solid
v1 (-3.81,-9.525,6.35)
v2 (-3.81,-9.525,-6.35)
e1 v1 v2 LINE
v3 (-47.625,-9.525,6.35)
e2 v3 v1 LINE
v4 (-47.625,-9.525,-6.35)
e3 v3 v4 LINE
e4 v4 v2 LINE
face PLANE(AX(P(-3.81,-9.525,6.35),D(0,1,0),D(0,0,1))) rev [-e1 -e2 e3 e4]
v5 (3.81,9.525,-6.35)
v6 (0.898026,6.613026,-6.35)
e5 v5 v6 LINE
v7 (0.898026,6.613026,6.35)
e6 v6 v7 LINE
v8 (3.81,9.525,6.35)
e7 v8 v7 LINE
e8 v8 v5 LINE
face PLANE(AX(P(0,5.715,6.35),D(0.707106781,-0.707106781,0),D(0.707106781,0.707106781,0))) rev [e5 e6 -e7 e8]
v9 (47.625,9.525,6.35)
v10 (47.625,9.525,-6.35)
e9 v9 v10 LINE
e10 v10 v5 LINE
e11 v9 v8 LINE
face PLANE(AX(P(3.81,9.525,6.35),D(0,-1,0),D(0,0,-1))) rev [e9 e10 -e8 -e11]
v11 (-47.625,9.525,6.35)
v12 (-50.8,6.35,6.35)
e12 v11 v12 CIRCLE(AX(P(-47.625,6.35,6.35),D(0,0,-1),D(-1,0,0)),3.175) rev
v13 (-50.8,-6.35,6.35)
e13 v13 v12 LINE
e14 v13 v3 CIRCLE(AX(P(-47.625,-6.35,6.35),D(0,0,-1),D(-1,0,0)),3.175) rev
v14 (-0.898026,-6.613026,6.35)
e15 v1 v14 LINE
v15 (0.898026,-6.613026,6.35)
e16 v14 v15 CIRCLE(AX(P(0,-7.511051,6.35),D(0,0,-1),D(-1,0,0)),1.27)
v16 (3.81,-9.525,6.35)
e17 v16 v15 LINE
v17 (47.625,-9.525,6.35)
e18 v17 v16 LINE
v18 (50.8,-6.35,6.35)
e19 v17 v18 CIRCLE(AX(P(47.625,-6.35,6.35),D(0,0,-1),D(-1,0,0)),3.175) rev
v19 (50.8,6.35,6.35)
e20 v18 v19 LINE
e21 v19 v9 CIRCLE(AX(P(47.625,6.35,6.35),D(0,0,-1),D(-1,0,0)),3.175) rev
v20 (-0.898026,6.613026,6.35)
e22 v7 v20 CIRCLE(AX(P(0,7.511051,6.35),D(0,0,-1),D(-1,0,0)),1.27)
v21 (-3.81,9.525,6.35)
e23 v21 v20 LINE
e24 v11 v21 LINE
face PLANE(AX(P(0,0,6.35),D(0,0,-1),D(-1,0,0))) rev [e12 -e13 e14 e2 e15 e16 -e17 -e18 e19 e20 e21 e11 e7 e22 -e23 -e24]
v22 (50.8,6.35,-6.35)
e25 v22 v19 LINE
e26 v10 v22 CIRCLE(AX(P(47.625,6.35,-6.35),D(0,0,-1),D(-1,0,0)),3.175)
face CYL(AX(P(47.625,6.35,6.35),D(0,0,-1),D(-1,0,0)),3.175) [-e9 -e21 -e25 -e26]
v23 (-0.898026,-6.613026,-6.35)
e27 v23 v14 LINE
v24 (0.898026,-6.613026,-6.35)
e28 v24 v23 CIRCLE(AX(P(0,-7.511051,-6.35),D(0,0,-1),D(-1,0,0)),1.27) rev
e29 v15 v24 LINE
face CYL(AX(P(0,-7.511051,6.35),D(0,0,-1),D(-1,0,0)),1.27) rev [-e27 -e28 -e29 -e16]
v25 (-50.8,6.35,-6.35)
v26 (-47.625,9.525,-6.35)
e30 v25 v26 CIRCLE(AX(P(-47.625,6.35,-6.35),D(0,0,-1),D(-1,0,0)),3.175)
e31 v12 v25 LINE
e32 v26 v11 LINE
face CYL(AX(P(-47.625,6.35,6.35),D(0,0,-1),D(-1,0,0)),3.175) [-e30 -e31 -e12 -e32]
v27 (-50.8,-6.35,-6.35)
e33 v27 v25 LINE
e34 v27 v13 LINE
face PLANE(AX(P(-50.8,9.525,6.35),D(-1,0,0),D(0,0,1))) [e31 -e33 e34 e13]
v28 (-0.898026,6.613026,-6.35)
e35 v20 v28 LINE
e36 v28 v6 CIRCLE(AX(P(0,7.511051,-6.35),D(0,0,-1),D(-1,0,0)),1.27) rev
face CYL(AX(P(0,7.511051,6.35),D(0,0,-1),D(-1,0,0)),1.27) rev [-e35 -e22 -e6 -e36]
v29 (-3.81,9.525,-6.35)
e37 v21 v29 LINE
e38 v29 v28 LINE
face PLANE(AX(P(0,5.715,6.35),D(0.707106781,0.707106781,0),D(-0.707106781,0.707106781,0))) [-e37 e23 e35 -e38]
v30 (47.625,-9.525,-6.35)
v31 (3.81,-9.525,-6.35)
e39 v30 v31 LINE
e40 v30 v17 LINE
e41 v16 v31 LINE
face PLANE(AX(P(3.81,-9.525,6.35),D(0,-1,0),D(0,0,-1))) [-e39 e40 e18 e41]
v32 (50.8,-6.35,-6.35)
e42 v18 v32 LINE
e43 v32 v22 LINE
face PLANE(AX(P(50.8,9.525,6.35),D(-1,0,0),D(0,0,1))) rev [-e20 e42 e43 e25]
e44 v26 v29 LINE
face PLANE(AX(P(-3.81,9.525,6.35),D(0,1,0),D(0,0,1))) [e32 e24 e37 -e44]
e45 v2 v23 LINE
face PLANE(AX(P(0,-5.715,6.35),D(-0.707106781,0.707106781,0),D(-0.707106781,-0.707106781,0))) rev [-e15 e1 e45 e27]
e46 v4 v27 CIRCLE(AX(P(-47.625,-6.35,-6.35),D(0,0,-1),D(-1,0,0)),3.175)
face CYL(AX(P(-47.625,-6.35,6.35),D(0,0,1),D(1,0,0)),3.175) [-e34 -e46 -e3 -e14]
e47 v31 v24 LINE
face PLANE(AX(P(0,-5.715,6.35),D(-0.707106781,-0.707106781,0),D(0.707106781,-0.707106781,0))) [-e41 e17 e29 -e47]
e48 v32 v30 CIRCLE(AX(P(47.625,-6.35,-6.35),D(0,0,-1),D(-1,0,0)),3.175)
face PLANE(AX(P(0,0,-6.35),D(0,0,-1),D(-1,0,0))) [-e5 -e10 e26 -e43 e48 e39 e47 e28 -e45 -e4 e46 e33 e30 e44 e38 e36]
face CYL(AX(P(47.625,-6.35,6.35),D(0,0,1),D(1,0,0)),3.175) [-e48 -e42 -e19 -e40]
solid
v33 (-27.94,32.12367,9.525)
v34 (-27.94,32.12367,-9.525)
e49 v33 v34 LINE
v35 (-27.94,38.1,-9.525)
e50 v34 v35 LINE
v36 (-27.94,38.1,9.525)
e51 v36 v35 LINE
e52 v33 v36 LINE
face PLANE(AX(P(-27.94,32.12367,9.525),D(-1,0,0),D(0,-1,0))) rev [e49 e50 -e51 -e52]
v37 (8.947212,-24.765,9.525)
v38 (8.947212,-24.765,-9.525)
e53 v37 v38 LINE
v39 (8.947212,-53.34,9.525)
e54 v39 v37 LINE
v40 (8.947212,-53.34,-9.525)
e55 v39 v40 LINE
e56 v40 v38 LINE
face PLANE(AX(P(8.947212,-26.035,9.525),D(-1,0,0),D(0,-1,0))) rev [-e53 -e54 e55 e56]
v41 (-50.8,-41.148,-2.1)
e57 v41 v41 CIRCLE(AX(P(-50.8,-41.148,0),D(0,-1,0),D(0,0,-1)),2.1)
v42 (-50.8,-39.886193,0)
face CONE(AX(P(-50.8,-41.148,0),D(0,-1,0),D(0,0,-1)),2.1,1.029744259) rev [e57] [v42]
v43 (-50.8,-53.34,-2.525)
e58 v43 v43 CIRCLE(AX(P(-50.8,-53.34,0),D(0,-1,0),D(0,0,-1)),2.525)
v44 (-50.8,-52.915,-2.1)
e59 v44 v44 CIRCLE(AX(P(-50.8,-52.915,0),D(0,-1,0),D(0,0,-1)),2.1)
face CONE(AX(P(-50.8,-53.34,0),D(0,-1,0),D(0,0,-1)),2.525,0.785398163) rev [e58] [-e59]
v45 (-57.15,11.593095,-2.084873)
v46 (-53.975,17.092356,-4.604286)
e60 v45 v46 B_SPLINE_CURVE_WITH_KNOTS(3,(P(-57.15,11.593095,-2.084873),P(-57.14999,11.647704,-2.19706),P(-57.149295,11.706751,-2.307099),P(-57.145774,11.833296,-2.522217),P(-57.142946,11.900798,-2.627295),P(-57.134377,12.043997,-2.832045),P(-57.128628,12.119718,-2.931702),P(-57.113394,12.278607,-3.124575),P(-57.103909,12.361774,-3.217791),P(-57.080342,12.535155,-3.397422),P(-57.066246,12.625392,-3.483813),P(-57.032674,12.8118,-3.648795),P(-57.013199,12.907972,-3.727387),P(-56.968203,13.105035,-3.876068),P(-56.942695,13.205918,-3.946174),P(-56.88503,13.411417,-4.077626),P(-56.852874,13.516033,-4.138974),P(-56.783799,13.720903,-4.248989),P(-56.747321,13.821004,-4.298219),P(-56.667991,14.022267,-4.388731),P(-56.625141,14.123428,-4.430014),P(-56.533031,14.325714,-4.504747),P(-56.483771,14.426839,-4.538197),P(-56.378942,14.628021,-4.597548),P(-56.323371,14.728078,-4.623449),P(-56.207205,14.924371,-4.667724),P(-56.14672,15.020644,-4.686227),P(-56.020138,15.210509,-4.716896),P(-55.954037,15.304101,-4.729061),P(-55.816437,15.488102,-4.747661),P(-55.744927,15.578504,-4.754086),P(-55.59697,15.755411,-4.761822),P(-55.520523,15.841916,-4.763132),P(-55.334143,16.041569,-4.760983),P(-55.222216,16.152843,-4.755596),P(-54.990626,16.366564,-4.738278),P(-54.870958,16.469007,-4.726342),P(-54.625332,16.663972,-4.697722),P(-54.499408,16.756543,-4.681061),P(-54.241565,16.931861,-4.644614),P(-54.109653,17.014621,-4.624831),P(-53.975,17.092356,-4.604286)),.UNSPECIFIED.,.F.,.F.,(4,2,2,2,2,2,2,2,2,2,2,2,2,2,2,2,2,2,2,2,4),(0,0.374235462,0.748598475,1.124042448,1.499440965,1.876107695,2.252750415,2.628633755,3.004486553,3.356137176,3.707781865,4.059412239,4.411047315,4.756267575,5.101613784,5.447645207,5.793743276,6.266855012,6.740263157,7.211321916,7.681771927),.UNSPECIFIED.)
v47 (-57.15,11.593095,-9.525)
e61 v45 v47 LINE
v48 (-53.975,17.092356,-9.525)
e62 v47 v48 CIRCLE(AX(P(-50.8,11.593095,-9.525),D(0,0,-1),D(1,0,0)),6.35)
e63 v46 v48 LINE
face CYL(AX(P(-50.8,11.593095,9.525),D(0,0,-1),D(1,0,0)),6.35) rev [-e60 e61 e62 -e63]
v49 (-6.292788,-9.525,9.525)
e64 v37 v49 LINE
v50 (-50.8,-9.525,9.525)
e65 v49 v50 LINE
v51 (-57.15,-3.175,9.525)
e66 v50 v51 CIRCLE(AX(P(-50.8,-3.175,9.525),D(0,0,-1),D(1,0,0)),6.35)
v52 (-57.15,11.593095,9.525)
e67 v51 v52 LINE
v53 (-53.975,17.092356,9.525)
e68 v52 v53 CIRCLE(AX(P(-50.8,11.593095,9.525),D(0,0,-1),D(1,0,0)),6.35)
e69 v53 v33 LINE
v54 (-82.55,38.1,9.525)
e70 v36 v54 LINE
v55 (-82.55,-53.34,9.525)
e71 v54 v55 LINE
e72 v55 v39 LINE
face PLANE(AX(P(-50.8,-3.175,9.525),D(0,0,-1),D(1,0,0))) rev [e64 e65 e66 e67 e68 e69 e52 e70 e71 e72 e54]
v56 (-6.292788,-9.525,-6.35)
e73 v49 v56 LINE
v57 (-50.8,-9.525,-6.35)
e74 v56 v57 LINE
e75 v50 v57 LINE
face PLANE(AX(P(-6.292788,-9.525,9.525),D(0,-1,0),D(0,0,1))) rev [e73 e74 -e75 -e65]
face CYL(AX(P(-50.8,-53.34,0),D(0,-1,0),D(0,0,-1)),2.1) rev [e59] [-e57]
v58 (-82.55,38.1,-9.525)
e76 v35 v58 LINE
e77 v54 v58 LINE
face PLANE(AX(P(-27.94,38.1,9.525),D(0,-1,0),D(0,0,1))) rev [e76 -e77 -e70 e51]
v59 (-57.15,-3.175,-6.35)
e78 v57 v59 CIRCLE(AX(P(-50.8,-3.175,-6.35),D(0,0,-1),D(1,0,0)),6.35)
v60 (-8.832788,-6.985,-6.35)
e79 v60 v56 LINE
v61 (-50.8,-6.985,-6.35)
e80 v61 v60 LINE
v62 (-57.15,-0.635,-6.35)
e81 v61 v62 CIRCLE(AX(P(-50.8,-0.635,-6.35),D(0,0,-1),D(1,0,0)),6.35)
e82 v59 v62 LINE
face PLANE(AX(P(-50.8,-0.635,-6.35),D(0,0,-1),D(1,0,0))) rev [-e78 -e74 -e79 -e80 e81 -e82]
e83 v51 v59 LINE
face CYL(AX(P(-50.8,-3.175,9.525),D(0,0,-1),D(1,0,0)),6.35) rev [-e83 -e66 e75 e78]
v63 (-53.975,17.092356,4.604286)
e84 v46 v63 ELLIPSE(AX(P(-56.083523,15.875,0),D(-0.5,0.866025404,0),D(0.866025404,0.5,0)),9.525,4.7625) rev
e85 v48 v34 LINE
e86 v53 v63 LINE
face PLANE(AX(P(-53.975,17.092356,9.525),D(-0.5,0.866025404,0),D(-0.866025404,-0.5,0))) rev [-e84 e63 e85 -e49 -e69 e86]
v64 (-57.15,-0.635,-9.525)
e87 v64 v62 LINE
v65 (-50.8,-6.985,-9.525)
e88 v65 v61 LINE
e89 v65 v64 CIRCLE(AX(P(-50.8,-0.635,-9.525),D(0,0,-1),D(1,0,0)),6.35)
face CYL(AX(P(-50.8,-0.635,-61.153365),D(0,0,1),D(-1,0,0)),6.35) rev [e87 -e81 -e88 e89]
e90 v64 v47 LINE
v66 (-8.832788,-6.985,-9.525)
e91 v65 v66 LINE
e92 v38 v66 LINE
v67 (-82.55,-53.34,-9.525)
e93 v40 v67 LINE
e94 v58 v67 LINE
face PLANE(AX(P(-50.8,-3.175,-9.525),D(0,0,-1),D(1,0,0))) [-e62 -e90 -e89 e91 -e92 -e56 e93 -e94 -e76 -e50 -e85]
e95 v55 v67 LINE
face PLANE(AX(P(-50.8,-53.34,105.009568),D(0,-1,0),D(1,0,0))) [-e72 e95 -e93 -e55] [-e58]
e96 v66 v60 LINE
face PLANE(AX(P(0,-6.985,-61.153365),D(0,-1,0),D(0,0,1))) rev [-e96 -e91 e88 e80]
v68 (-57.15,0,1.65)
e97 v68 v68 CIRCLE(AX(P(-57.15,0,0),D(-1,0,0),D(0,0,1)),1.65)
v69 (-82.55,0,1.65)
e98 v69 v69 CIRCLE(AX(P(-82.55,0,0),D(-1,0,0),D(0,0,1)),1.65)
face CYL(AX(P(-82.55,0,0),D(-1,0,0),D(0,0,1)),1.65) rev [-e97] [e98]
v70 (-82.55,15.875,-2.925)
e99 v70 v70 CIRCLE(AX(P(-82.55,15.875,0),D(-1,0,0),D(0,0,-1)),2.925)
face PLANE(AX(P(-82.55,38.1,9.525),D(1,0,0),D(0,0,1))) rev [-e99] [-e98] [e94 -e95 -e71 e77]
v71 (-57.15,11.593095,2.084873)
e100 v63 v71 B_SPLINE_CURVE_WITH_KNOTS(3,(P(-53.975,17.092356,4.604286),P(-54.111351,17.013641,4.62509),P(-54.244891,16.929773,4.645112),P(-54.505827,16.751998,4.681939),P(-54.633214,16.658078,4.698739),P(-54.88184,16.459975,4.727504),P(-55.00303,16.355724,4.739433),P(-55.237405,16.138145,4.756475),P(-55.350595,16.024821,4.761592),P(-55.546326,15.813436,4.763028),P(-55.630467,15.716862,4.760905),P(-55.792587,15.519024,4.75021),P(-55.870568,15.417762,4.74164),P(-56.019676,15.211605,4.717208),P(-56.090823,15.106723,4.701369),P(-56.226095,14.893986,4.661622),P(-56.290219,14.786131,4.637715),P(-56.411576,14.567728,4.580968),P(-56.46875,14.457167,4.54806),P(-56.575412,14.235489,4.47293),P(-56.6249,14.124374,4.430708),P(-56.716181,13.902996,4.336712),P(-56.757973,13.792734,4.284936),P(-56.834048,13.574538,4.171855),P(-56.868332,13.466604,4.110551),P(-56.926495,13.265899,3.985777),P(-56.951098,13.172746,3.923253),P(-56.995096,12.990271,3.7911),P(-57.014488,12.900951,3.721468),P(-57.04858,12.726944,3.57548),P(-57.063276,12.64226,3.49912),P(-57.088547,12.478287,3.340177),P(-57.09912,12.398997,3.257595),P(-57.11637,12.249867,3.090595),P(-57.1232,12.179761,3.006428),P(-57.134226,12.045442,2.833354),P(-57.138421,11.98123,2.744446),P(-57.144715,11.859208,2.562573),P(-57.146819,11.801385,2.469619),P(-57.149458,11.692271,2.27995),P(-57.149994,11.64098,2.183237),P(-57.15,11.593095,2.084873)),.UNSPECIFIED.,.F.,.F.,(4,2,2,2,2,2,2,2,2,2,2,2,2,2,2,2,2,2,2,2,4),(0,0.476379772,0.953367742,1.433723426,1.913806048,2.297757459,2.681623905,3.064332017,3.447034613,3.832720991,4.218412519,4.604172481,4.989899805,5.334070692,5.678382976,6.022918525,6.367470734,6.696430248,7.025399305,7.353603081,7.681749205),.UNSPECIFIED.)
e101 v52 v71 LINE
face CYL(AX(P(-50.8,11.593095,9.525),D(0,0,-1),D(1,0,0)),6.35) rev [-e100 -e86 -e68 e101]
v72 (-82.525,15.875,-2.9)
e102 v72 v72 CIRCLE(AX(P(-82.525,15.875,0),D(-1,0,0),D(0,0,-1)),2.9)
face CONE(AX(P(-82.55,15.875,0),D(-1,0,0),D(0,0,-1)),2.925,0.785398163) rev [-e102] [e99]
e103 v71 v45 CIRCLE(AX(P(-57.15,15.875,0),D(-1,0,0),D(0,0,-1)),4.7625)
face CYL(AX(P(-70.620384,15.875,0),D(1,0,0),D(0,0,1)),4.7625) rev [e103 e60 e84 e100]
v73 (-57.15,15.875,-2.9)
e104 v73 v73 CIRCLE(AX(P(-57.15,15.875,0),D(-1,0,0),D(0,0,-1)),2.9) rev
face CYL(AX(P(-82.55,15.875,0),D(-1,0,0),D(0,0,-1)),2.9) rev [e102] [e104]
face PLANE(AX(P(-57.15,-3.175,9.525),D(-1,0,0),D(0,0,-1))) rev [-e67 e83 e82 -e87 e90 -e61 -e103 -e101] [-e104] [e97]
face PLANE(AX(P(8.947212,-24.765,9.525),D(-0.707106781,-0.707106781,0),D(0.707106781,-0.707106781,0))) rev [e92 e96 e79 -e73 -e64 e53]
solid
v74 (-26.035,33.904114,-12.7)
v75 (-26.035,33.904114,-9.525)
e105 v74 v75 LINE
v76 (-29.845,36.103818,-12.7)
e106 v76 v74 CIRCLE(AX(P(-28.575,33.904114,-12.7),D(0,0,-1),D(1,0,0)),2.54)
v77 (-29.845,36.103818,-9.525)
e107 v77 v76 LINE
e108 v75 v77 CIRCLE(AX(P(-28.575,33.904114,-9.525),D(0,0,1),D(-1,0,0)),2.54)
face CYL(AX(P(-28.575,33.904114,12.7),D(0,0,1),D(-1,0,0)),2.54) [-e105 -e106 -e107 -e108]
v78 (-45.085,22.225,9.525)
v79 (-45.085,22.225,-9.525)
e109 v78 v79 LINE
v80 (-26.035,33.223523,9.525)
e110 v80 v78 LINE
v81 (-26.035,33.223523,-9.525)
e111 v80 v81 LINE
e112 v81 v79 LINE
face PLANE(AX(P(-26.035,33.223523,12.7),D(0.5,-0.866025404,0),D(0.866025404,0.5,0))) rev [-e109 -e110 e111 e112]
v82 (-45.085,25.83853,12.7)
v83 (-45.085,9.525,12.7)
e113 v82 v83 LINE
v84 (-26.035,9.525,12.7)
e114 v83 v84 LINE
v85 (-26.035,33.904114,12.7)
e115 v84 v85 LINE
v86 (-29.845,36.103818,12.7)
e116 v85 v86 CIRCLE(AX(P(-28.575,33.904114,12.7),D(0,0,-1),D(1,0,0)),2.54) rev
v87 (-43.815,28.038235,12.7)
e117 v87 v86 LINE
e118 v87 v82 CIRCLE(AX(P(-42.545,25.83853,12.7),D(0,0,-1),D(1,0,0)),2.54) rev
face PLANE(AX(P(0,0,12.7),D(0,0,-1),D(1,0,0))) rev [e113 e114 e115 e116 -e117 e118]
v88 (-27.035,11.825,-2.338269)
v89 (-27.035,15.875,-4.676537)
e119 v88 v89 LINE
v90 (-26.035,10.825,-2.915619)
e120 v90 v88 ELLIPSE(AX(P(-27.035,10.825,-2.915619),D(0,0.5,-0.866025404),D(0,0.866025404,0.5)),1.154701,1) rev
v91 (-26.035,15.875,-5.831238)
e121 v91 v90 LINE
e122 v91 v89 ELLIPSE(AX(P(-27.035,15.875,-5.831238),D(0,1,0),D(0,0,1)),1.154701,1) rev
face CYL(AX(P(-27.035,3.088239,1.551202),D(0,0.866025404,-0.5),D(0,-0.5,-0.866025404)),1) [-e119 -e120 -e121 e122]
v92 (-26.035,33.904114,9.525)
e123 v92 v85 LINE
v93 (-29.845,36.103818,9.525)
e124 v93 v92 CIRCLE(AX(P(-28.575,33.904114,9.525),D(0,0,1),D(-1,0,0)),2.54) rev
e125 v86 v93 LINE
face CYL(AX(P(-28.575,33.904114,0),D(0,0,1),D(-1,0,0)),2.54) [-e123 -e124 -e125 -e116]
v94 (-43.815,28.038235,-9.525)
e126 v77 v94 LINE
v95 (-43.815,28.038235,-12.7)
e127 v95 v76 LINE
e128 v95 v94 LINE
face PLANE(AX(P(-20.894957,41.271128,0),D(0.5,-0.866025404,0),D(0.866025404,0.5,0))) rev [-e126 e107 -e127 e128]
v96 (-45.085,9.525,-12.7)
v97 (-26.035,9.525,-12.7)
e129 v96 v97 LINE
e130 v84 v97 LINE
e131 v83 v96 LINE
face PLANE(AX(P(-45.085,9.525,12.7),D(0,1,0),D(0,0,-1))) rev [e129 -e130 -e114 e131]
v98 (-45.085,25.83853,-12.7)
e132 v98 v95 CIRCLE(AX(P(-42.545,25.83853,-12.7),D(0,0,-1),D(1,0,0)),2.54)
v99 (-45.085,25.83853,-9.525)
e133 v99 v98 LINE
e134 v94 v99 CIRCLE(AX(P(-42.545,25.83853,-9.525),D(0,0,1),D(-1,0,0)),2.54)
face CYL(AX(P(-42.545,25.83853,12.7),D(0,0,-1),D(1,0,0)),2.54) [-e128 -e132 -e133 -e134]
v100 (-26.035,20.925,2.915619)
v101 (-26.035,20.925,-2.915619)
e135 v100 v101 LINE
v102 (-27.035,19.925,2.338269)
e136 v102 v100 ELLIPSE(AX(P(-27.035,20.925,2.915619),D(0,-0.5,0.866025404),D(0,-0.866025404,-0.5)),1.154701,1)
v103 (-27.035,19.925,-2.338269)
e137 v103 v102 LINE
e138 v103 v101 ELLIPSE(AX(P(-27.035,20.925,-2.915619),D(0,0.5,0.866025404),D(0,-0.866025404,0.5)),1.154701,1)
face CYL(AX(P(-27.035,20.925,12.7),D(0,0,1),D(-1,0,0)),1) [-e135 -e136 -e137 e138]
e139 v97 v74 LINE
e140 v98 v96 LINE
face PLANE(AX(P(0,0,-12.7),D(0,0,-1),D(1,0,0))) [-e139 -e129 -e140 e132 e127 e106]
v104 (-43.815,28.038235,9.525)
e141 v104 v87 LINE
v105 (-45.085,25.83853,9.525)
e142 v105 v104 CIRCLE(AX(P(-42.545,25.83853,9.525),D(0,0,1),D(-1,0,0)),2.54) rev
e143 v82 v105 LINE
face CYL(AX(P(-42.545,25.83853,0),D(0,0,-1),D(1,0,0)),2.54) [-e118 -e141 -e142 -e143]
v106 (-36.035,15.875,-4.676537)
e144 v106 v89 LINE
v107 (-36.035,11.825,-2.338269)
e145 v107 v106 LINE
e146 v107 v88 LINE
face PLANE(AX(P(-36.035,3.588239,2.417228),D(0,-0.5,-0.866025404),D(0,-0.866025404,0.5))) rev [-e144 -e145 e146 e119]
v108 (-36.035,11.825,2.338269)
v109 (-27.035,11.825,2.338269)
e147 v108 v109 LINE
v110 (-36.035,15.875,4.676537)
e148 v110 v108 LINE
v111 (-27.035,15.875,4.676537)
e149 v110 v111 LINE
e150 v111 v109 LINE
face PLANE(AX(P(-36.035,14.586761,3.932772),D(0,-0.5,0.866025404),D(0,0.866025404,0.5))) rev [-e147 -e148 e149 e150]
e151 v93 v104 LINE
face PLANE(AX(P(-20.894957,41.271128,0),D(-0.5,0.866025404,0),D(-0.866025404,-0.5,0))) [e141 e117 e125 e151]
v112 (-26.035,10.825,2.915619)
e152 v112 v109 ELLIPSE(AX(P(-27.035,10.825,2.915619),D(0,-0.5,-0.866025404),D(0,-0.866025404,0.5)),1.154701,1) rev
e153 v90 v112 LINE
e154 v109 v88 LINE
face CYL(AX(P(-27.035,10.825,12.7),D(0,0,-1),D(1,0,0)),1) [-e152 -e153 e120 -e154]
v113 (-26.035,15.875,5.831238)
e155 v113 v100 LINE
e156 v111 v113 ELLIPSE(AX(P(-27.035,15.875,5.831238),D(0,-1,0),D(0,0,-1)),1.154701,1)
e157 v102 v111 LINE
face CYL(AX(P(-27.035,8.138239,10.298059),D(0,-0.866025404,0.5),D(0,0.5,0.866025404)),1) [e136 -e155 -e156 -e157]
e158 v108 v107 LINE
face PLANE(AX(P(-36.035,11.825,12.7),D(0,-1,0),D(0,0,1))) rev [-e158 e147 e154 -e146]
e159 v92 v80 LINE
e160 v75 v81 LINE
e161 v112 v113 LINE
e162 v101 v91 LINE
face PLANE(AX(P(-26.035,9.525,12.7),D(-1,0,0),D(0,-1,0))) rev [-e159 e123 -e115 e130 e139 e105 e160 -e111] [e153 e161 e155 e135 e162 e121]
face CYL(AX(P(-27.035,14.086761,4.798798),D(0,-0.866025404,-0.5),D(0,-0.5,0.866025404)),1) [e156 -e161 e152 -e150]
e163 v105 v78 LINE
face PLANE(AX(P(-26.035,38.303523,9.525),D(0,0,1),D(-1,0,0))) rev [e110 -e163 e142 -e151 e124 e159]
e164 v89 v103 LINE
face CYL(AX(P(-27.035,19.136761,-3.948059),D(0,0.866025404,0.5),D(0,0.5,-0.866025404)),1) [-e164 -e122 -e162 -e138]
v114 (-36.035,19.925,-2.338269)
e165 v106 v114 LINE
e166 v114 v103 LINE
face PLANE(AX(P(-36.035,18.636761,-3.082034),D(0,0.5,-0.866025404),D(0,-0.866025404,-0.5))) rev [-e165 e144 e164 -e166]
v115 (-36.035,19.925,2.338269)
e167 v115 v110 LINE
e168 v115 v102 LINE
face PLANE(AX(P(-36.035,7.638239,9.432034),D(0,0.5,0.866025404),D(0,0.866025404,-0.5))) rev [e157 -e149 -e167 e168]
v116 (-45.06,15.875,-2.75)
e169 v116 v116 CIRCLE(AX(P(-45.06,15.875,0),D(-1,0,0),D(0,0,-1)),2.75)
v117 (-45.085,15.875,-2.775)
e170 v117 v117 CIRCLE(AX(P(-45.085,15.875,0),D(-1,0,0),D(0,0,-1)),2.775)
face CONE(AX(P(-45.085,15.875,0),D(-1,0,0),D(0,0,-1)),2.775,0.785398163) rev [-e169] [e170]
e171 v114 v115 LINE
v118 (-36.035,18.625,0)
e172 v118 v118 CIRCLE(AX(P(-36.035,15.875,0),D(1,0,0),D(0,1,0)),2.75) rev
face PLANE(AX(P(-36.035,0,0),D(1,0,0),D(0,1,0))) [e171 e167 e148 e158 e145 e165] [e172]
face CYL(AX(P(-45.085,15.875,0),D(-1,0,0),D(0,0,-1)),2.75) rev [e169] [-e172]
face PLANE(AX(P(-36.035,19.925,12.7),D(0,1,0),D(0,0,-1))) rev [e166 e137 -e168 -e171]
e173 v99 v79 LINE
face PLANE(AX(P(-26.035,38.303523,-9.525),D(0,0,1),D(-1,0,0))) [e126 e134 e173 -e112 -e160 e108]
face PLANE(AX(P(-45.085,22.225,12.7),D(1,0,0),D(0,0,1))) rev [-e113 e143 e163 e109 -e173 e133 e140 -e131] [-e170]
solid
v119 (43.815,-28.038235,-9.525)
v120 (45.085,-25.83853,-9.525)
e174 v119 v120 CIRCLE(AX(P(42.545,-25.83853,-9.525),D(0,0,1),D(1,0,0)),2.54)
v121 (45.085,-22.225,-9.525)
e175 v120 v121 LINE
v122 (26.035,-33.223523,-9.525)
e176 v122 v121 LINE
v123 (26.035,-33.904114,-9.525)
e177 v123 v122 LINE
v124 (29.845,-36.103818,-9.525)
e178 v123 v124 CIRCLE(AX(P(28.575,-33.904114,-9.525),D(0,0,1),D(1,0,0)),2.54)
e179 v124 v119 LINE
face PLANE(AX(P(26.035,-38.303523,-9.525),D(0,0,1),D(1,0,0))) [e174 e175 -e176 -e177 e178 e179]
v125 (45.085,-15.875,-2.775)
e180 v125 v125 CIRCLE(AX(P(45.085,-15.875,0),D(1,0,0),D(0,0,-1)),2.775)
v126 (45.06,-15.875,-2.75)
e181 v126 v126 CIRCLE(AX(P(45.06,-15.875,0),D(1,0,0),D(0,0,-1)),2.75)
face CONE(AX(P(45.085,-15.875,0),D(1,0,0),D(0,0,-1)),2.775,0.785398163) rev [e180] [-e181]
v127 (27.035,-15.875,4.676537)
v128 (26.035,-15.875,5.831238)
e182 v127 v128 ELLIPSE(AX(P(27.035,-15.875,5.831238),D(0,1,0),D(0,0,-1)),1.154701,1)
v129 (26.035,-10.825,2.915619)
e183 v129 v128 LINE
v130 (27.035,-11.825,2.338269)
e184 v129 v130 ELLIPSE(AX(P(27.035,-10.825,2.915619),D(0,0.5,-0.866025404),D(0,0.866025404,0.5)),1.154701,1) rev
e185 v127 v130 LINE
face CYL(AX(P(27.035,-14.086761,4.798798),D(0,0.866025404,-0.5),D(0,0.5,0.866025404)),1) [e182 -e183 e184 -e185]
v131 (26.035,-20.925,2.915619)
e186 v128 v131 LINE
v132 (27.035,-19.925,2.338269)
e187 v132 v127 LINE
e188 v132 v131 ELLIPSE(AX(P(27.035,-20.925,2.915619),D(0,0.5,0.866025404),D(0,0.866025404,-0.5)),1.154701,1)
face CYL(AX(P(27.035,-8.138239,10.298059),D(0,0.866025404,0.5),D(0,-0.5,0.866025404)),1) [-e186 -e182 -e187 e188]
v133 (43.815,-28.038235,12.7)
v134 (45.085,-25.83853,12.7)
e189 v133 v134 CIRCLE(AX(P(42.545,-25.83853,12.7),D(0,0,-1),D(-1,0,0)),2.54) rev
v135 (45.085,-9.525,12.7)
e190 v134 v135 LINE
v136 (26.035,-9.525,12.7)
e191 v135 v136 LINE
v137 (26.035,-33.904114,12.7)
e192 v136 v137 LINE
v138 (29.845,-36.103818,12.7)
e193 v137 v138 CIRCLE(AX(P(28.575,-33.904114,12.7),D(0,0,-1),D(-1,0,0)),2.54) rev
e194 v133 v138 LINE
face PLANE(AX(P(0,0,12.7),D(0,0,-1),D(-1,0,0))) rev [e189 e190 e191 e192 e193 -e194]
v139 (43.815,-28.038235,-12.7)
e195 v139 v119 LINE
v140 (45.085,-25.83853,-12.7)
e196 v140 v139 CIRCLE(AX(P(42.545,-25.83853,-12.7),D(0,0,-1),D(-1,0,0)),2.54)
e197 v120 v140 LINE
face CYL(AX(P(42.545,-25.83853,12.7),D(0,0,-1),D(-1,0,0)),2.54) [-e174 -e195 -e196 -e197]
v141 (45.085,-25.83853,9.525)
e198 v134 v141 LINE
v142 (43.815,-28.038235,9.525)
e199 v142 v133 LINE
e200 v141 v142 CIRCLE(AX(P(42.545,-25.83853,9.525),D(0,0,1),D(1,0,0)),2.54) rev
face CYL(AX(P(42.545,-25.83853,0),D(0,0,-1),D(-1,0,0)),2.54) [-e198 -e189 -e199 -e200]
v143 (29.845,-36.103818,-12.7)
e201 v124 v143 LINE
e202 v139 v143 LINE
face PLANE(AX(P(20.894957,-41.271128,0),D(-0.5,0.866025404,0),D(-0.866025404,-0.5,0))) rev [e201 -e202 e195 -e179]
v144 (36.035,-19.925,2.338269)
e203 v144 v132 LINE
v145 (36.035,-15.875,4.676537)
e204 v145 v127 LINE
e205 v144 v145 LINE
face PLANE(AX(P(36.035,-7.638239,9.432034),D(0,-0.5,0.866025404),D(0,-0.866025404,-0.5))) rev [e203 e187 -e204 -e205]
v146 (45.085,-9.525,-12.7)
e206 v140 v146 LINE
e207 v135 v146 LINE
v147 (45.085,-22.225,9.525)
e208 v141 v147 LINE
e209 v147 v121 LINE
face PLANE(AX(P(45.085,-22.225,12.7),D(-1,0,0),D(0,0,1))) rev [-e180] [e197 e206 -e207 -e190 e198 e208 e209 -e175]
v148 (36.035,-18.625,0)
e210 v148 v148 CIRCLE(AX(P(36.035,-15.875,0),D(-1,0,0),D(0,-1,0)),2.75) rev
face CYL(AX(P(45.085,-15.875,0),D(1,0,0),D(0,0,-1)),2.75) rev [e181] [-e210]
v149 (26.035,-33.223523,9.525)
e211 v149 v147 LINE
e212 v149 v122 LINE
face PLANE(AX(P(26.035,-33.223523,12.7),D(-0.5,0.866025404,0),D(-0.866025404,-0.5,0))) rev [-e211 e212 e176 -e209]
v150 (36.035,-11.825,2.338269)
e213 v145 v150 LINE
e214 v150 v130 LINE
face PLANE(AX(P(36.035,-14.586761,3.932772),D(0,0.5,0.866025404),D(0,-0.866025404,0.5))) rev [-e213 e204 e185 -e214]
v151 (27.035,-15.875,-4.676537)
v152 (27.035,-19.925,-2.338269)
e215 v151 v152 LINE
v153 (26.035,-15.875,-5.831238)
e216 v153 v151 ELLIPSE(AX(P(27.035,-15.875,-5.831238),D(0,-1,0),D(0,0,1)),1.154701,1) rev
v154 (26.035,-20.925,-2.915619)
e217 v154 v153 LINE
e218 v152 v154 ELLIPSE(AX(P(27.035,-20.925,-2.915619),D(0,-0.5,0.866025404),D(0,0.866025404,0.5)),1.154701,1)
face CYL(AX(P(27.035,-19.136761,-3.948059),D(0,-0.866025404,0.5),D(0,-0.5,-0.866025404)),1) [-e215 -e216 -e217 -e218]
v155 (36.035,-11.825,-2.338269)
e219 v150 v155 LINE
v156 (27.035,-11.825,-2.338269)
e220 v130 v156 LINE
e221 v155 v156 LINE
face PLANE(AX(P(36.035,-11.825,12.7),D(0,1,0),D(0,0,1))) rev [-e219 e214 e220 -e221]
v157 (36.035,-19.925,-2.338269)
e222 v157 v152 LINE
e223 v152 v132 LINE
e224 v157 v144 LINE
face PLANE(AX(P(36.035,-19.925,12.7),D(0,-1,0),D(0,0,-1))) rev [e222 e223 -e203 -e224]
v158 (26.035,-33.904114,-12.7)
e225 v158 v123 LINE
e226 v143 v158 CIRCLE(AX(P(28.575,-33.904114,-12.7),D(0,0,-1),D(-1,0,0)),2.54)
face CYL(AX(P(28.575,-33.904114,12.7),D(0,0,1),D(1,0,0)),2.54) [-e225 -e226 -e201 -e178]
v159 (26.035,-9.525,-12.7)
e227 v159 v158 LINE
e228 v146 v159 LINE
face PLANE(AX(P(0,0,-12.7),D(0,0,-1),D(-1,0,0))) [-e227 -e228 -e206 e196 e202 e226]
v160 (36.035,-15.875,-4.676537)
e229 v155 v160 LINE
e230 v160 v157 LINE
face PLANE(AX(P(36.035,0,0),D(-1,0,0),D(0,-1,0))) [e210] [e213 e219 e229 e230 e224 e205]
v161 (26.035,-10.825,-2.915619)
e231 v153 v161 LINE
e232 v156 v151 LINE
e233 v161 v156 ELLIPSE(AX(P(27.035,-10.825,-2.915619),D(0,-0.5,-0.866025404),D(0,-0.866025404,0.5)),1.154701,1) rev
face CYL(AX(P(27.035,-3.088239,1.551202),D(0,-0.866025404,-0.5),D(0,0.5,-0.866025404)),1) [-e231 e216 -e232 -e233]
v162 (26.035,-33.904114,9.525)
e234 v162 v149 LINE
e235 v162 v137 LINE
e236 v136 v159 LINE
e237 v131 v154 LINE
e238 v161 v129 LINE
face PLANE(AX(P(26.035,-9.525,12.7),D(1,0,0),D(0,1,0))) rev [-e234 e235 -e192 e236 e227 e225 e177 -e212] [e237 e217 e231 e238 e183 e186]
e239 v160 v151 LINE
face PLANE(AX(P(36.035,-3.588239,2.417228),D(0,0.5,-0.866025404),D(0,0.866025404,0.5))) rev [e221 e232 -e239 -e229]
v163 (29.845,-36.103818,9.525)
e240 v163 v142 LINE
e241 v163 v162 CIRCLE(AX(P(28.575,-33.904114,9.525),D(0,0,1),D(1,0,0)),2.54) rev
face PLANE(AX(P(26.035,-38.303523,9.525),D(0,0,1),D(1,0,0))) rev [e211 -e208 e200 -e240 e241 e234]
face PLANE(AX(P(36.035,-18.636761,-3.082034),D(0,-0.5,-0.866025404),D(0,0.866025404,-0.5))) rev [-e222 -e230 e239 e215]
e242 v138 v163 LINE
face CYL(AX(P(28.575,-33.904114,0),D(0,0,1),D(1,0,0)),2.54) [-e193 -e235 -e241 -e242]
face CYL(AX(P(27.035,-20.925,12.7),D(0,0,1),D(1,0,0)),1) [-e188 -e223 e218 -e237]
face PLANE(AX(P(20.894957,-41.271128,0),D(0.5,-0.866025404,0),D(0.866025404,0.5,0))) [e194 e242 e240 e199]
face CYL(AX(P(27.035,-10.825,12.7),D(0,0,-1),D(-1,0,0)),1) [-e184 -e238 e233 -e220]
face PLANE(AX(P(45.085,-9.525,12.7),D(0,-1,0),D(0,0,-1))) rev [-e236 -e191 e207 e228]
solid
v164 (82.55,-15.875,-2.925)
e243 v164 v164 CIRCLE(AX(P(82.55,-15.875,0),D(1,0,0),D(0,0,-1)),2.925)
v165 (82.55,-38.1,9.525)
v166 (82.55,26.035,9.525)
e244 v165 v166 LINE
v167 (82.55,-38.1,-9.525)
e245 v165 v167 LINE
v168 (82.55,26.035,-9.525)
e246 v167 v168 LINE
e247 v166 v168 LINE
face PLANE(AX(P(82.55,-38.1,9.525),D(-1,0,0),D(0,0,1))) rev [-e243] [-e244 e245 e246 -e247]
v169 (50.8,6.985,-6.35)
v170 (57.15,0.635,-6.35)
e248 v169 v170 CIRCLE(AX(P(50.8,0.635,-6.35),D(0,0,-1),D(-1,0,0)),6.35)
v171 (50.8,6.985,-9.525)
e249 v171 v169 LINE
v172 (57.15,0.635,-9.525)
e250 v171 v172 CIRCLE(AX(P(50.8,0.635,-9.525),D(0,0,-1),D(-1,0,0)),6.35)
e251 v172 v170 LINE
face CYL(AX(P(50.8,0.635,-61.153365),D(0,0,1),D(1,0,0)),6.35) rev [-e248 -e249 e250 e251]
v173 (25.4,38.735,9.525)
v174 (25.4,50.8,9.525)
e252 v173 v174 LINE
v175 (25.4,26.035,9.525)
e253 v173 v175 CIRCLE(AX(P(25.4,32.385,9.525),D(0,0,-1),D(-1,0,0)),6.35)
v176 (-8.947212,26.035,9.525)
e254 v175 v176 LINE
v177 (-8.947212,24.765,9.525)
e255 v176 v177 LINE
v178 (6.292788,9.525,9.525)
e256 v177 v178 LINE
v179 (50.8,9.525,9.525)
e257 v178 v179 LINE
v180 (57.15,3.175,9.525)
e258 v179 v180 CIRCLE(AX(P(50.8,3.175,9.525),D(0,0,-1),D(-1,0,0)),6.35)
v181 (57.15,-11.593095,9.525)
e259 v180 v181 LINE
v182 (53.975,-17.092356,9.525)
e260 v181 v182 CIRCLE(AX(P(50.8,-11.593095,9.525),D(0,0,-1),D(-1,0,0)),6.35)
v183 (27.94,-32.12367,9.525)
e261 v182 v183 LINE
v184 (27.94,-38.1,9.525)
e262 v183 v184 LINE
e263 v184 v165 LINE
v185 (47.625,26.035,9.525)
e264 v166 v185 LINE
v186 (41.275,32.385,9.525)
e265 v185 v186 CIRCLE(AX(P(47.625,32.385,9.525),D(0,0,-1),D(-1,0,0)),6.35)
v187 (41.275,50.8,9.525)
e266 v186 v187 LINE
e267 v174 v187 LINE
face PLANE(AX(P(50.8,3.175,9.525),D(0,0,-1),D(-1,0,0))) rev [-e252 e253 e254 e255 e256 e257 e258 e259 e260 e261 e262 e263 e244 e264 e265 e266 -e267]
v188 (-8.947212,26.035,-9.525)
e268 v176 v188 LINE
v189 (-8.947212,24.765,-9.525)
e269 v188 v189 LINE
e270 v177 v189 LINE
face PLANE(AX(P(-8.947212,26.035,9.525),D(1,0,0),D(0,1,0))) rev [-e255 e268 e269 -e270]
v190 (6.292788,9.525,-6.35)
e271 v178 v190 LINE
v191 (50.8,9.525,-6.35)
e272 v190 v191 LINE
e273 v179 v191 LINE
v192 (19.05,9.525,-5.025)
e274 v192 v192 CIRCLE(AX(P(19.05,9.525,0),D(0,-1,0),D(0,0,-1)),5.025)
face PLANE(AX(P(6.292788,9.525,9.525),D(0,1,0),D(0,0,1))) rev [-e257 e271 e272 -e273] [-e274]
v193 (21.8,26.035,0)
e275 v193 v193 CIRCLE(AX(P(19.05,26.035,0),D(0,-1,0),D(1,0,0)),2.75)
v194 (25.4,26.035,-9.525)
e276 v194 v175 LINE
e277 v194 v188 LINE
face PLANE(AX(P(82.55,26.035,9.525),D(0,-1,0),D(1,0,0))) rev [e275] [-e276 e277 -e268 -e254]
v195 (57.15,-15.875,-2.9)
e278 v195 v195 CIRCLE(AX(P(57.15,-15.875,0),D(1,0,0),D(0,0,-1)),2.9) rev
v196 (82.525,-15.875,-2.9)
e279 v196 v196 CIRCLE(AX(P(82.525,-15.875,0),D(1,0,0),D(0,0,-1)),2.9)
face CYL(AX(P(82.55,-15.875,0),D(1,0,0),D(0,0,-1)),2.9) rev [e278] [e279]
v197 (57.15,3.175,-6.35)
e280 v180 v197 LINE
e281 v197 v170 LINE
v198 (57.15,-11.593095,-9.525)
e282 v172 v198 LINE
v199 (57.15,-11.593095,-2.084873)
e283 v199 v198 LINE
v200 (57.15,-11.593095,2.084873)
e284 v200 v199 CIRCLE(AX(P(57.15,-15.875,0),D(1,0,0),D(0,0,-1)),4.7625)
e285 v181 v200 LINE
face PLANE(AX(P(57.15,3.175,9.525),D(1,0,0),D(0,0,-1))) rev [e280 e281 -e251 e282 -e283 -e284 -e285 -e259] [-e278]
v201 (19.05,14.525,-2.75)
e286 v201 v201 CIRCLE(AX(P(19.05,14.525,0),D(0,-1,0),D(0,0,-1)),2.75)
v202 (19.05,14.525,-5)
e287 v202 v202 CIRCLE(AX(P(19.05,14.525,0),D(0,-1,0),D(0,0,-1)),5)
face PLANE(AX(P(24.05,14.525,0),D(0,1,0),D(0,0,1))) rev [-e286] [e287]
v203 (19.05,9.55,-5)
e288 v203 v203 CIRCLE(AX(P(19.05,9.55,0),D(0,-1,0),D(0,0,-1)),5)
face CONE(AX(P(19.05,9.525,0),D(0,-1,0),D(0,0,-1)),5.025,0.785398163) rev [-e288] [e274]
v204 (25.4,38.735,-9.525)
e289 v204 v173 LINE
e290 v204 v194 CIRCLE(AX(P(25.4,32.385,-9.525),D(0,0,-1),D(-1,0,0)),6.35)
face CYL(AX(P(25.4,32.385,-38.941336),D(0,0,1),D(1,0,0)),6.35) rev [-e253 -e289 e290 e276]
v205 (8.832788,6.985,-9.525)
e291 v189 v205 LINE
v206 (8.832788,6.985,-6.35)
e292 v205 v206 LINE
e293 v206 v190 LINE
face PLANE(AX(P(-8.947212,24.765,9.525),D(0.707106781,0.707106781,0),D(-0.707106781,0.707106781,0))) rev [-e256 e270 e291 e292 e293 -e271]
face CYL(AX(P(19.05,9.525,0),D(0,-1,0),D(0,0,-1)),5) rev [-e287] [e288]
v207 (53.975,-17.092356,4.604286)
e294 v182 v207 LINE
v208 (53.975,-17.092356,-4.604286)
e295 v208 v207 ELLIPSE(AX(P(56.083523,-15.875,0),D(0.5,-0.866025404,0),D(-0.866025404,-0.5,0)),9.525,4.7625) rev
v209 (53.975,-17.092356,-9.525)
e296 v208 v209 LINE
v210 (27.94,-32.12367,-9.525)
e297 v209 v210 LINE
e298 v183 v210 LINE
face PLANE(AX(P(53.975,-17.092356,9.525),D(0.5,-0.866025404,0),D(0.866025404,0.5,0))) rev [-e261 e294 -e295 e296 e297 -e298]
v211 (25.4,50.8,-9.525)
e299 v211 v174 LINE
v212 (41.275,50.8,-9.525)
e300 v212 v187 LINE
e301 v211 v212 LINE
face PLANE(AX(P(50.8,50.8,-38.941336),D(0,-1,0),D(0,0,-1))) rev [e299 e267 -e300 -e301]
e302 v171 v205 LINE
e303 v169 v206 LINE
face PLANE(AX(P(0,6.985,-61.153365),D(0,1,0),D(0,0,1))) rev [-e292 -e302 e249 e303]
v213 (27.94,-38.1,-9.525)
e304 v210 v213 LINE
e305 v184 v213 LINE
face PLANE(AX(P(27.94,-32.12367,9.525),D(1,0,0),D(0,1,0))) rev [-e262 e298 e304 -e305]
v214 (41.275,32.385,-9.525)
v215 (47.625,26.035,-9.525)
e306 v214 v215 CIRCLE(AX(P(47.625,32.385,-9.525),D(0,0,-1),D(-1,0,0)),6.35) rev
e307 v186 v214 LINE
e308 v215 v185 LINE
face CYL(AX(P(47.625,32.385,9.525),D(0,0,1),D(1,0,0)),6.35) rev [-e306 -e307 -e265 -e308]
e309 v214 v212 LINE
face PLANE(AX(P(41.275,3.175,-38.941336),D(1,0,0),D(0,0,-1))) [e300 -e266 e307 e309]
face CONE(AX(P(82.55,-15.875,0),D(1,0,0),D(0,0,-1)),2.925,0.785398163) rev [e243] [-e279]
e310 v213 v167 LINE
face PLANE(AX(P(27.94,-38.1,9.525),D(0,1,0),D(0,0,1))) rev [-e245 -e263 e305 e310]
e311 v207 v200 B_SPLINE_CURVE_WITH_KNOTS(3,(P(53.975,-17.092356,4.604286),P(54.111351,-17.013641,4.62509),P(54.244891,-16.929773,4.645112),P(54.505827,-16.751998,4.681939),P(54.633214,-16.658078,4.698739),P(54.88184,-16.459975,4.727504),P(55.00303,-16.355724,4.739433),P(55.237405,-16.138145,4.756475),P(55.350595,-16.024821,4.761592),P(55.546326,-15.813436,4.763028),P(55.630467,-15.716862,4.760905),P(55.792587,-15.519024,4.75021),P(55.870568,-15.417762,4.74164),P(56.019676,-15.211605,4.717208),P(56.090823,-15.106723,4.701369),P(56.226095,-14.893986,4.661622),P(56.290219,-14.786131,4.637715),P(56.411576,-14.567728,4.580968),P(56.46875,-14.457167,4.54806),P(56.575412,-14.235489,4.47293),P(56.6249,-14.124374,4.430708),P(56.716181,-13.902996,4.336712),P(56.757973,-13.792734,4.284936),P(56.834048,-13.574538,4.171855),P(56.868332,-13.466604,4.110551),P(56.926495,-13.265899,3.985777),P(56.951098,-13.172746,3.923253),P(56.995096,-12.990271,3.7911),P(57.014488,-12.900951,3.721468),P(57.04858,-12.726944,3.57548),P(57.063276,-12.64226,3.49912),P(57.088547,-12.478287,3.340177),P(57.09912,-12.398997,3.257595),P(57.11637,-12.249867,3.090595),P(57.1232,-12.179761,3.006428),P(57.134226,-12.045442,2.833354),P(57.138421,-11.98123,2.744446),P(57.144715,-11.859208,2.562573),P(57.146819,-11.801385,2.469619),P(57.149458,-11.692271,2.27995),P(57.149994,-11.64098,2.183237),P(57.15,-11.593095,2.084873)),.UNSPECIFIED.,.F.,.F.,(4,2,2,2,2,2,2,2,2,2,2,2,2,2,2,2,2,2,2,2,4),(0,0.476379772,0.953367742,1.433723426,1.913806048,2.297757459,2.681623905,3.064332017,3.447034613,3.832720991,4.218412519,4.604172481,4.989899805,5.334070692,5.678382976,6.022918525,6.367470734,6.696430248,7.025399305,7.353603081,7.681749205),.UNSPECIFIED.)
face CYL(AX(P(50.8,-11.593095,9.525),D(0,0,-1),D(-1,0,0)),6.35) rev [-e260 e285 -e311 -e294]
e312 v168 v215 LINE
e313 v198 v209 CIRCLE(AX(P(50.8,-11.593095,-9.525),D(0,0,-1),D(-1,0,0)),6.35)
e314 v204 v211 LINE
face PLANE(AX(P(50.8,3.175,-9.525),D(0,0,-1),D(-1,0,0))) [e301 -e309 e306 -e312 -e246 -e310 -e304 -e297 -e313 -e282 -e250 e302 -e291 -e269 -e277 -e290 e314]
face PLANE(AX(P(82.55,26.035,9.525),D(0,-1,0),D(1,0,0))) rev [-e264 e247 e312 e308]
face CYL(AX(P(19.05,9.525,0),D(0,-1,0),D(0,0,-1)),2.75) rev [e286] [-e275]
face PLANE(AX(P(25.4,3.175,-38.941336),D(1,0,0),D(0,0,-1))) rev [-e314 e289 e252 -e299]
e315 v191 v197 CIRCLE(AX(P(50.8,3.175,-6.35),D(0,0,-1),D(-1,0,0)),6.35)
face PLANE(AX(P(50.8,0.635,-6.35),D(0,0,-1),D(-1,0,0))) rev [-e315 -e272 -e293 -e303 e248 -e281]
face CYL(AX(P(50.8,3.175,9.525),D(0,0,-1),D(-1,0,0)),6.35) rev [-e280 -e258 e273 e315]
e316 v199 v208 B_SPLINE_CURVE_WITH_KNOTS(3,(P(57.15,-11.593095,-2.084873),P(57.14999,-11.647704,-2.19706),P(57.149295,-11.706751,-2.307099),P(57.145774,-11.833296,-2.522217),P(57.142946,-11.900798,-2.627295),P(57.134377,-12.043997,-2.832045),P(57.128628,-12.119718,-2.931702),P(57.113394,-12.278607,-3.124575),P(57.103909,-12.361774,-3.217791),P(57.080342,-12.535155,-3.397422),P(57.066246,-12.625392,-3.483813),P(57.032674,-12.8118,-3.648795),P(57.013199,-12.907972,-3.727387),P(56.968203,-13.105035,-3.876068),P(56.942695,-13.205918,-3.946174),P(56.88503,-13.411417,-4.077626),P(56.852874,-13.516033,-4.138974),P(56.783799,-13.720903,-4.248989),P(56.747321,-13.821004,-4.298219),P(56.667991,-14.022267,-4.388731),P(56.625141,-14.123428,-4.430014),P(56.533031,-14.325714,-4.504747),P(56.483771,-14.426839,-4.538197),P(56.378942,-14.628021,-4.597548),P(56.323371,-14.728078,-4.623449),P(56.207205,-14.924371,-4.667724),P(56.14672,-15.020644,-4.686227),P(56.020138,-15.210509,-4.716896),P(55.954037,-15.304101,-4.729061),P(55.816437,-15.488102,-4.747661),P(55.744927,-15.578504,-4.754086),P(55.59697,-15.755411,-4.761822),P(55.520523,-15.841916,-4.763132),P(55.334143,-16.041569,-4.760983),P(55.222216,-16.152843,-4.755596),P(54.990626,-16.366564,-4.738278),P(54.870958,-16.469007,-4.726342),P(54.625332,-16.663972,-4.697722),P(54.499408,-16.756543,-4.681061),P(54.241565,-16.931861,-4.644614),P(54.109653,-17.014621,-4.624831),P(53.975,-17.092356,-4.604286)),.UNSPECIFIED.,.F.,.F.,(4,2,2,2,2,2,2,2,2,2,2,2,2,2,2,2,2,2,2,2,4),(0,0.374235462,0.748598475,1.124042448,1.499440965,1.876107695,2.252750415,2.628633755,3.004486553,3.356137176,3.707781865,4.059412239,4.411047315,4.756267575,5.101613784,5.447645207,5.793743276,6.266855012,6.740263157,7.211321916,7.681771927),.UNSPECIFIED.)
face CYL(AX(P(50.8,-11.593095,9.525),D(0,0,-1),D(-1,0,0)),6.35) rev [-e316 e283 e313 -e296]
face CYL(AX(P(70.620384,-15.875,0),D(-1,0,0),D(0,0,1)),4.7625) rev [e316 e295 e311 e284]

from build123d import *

# Parameters (mm, degrees)
BOSS_EXTRUDE1_DEPTH                      = 6.35
MIRROR1_AT_THE_SECOND_PLANE_COPY_1_DEPTH = 6.35
FILLET1_R                                = 1.27
FILLET2_R                                = 3.175
BOSS_EXTRUDE2_DEPTH                      = 9.525
BOSS_EXTRUDE3_DEPTH                      = 12.7
BOSS_EXTRUDE6_START                      = -12.7
BOSS_EXTRUDE6_DEPTH                      = 3.175
FILLET4_R                                = 2.54
CUT_EXTRUDE1_START                       = 26.035
CUT_EXTRUDE1_DEPTH                       = 10
SKETCH32_R                               = 4.7625
CUT_EXTRUDE3_DEPTH                       = 57.15
BOSS_EXTRUDE7_START                      = -6.35
BOSS_EXTRUDE7_DEPTH                      = 3.175
FILLET5_R                                = 1
MIRROR2_ANGLE                            = 180
MIRROR2_2_ANGLE                          = 180
BOSS_EXTRUDE4_START                      = 9.525
BOSS_EXTRUDE4_DEPTH                      = 19.05
FILLET3_R                                = 6.35
BOSS_EXTRUDE5_START                      = -9.525
SKETCH11_W                               = 91.497211864
SKETCH11_H                               = 27.305
BOSS_EXTRUDE5_DEPTH                      = 19.05
SKETCH31_W                               = 1.65
SKETCH31_H                               = 165.1


with BuildPart() as part:
    # Sketch1 → Boss-Extrude1 (new, symmetric)
    with BuildSketch(Plane.XY):
        Polygon((0, 0), (0, 5.715), (3.81, 9.525), (50.8, 9.525), (50.8, 0), align=None)
    boss_extrude1 = extrude(amount=BOSS_EXTRUDE1_DEPTH, both=True)



with BuildPart() as mirror1_1:
    # Mirror1: Boss-Extrude1 across plane
    add(boss_extrude1.mirror(Plane(origin=(0, 0, 0), x_dir=(0, 0, 1), z_dir=(1, 0, 0))))


with BuildPart() as part_1:
    add(part.part)

    add(mirror1_1.part)  # Mirror1 at the second plane merges Mirror1_1
    # Mirror1 at the second plane: Boss-Extrude1 across plane
    add(boss_extrude1.mirror(Plane.ZX))

    # Mirror1 at the second plane copy 1 sketc → Mirror1 at the second plane copy 1 (add, symmetric)
    with BuildSketch(Plane(origin=(0, 0, 0), x_dir=(-1, 0, 0), z_dir=(0, 0, 1))):
        Polygon((0, 0), (0, 5.715), (3.81, 9.525), (50.8, 9.525), (50.8, 0), align=None)
    extrude(amount=MIRROR1_AT_THE_SECOND_PLANE_COPY_1_DEPTH, both=True)

    # Fillet1
    fillet1_edges = [part_1.edges().sort_by_distance(p)[0] for p in [
        (0, -5.715, 0),
        (0, 5.715, 0),
    ]]
    fillet(fillet1_edges, radius=FILLET1_R)

    # Fillet2
    fillet2_edges = [part_1.edges().sort_by_distance(p)[0] for p in [
        (50.8, -9.525, 0),
        (-50.8, 9.525, 0),
        (-50.8, -9.525, 0),
        (50.8, 9.525, 0),
    ]]
    fillet(fillet2_edges, radius=FILLET2_R)


with BuildPart() as body_2:
    # Sketch2 → Boss-Extrude2 (new, symmetric)
    with BuildSketch(Plane.XY):
        with BuildLine():
            Line((6.292788136, 9.525), (50.8, 9.525))
            ThreePointArc((50.8, 9.525), (55.290128061, 7.665128061), (57.15, 3.175))
            Line((57.15, 3.175), (57.15, -11.593094793))
            ThreePointArc((57.15, -11.593094793), (56.299261314, -14.768094793), (53.975, -17.092356107))
            Line((53.975, -17.092356107), (27.94, -32.123670365))
            Line((27.94, -32.123670365), (27.94, -38.1))
            Line((27.94, -38.1), (82.55, -38.1))
            Line((82.55, -38.1), (82.55, 26.035))
            Line((82.55, 26.035), (-8.947211864, 26.035))
            Line((-8.947211864, 26.035), (-8.947211864, 24.765))
            Line((-8.947211864, 24.765), (6.292788136, 9.525))
        make_face()
    extrude(amount=BOSS_EXTRUDE2_DEPTH, both=True)

    # Sketch8 → M5 Clearance Hole2 (revolve, cut)
    with BuildSketch(Plane(origin=(82.55, -15.875, 0), x_dir=(0, 0, -1), z_dir=(0, 1, 0))):
        Polygon((0, 0), (0, 133.35), (2.9, 133.35), (2.9, 0.025), (2.925, 0), align=None)
    revolve(axis=Axis((88.9, -15.875, 0), (-1, 0, 0)), mode=Mode.SUBTRACT)

    # Sketch32 → Cut-Extrude3 (cut)
    with BuildSketch(Plane(origin=(0, 0, 0), x_dir=(0, 0, -1), z_dir=(1, 0, 0))):
        with Locations((0, -15.875)):
            Circle(SKETCH32_R)
    extrude(amount=CUT_EXTRUDE3_DEPTH, mode=Mode.SUBTRACT)

    # Sketch34 → Boss-Extrude7 (add)
    with BuildSketch(Plane.XY.offset(BOSS_EXTRUDE7_START)):
        with BuildLine():
            Line((6.292788136, 9.525), (8.832788136, 6.985))
            Line((8.832788136, 6.985), (50.8, 6.985))
            ThreePointArc((50.8, 6.985), (55.290128061, 5.125128061), (57.15, 0.635))
            Line((57.15, 0.635), (57.15, 3.175))
            ThreePointArc((57.15, 3.175), (55.290128061, 7.665128061), (50.8, 9.525))
            Line((50.8, 9.525), (6.292788136, 9.525))
        make_face()
    extrude(amount=-BOSS_EXTRUDE7_DEPTH)


with BuildPart() as body_3:
    # Sketch2<4> → Boss-Extrude3 (new, symmetric)
    with BuildSketch(Plane.XY):
        Polygon((26.035, -33.223522628), (45.085, -22.225), (45.085, -9.525), (26.035, -9.525), align=None)
    extrude(amount=BOSS_EXTRUDE3_DEPTH, both=True)

    # Sketch6 → M5 Clearance Hole1 (revolve, cut)
    with BuildSketch(Plane(origin=(45.085, -15.875, 0), x_dir=(0, 0, -1), z_dir=(0, 1, 0))):
        Polygon((0, 0), (0, 95.885), (2.75, 95.885), (2.75, 0.025), (2.775, 0), align=None)
    revolve(axis=Axis((51.435, -15.875, 0), (-1, 0, 0)), mode=Mode.SUBTRACT)

    # Boss-Extrude6: read off the stored shape, not the designer's step
    # Boss-Extrude6 outline → Boss-Extrude6 (add)
    with BuildSketch(Plane.XY.offset(BOSS_EXTRUDE6_START)):
        Polygon((26.035, -33.223522628), (26.035, -38.303522628), (45.085, -27.305), (45.085, -22.225), align=None)
    boss_extrude6 = extrude(amount=BOSS_EXTRUDE6_DEPTH)

    # Mirror3: Boss-Extrude6 across plane
    add(boss_extrude6.mirror(Plane.XY))

    # Fillet4
    fillet4_edges = [body_3.edges().sort_by_distance(p)[0] for p in [
        (45.085, -27.305, -11.1125),
        (26.035, -38.303522628, -11.1125),
        (26.035, -38.303522628, 11.1125),
        (45.085, -27.305, 11.1125),
    ]]
    fillet(fillet4_edges, radius=FILLET4_R)

    # Sketch27 → Cut-Extrude1 (cut)
    with BuildSketch(Plane(origin=(0, 0, 0), x_dir=(0, 0, -1), z_dir=(1, 0, 0)).offset(CUT_EXTRUDE1_START)):
        Polygon((2.33826859, -19.925), (4.67653718, -15.875), (2.33826859, -11.825), (-2.33826859, -11.825), (-4.67653718, -15.875), (-2.33826859, -19.925), align=None)
    extrude(amount=CUT_EXTRUDE1_DEPTH, mode=Mode.SUBTRACT)

    # Fillet5
    fillet5_edges = [body_3.edges().sort_by_distance(p)[0] for p in [
        (26.035, -13.85, 3.507402885),
        (26.035, -11.825, 0),
        (26.035, -13.85, -3.507402885),
        (26.035, -17.9, -3.507402885),
        (26.035, -19.925, 0),
        (26.035, -17.9, 3.507402885),
    ]]
    fillet(fillet5_edges, radius=FILLET5_R)


with BuildPart() as body_4:
    # Mirror2: read off the stored shape, not the designer's step
    # Mirror2: copy of body 3
    add(body_3.part.rotate(Axis((0, 0, 0), (0, 0, 1)), MIRROR2_ANGLE))


with BuildPart() as body_5:
    # Mirror2 2: copy of body 2
    add(body_2.part.rotate(Axis((0, 0, 0), (0, 0, 1)), MIRROR2_2_ANGLE))

    # Sketch11 → Boss-Extrude5 (add)
    with BuildSketch(Plane.XY.offset(BOSS_EXTRUDE5_START)):
        with Locations((-36.801394068, -39.6875)):
            Rectangle(SKETCH11_W, SKETCH11_H)
    extrude(amount=BOSS_EXTRUDE5_DEPTH)

    # Sketch13 → M5x0.8 Tapped Hole3 (revolve, cut)
    with BuildSketch(Plane(origin=(-50.8, -53.34, 0), x_dir=(0, 0, -1), z_dir=(1, 0, 0))):
        Polygon((0, 0), (0, 13.4538073), (2.1, 12.192), (2.1, 0.425), (2.525, 0), align=None)
    revolve(axis=Axis((-50.8, -59.69, 0), (0, 1, 0)), mode=Mode.SUBTRACT)

    # Sketch31 → M4x0.7 Tapped Hole1 (revolve, cut)
    with BuildSketch(Plane(origin=(-82.55, 0, 0), x_dir=(0, 0, 1), z_dir=(0, 1, 0))):
        with Locations((0.825, 82.55)):
            Rectangle(SKETCH31_W, SKETCH31_H)
    revolve(axis=Axis((-88.9, 0, 0), (1, 0, 0)), mode=Mode.SUBTRACT)


with BuildPart() as body_6:
    # Mirror2 3: mirrored copy
    add(body_3.part.mirror(Plane(origin=(0, 0, 0), x_dir=(1, 0, 0), z_dir=(0, 1, 0))))


with BuildPart() as body_7:
    # Mirror2 4: mirrored copy
    add(body_3.part.mirror(Plane.YZ))


with BuildPart() as body_8:
    # Mirror2 5: mirrored copy
    add(body_2.part.mirror(Plane(origin=(0, 0, 0), x_dir=(1, 0, 0), z_dir=(0, 1, 0))))


with BuildPart() as body_9:
    # Mirror2 6: mirrored copy
    add(body_2.part.mirror(Plane.YZ))


with BuildPart() as body_2_1:
    add(body_2.part)

    # Sketch9 → Boss-Extrude4 (add)
    with BuildSketch(Plane.XY.offset(BOSS_EXTRUDE4_START)):
        with BuildLine():
            Line((25.4, 26.035), (41.275, 26.035))
            Line((41.275, 26.035), (41.275, 50.8))
            Line((41.275, 50.8), (25.4, 50.8))
            Line((25.4, 50.8), (25.4, 38.735))
            ThreePointArc((25.4, 38.735), (31.75, 32.385), (25.4, 26.035))
        make_face()
    extrude(amount=-BOSS_EXTRUDE4_DEPTH)

    # Fillet3
    fillet3_edges = [body_2_1.edges().sort_by_distance(p)[0] for p in [
        (41.275, 26.035, 0),
    ]]
    fillet(fillet3_edges, radius=FILLET3_R)

    # Sketch25 → CBORE for M5 SHCS1 (revolve, cut)
    with BuildSketch(Plane(origin=(19.05, 9.525, 0), x_dir=(0, 0, -1), z_dir=(1, 0, 0))):
        Polygon((0, 0), (0, 41.275), (2.75, 41.275), (2.75, 5), (5, 5), (5, 0.025), (5.025, 0), align=None)
    revolve(axis=Axis((19.05, 3.175, 0), (0, 1, 0)), mode=Mode.SUBTRACT)


solid = Compound([part_1.part, body_3.part, body_4.part, body_5.part, body_2_1.part])
